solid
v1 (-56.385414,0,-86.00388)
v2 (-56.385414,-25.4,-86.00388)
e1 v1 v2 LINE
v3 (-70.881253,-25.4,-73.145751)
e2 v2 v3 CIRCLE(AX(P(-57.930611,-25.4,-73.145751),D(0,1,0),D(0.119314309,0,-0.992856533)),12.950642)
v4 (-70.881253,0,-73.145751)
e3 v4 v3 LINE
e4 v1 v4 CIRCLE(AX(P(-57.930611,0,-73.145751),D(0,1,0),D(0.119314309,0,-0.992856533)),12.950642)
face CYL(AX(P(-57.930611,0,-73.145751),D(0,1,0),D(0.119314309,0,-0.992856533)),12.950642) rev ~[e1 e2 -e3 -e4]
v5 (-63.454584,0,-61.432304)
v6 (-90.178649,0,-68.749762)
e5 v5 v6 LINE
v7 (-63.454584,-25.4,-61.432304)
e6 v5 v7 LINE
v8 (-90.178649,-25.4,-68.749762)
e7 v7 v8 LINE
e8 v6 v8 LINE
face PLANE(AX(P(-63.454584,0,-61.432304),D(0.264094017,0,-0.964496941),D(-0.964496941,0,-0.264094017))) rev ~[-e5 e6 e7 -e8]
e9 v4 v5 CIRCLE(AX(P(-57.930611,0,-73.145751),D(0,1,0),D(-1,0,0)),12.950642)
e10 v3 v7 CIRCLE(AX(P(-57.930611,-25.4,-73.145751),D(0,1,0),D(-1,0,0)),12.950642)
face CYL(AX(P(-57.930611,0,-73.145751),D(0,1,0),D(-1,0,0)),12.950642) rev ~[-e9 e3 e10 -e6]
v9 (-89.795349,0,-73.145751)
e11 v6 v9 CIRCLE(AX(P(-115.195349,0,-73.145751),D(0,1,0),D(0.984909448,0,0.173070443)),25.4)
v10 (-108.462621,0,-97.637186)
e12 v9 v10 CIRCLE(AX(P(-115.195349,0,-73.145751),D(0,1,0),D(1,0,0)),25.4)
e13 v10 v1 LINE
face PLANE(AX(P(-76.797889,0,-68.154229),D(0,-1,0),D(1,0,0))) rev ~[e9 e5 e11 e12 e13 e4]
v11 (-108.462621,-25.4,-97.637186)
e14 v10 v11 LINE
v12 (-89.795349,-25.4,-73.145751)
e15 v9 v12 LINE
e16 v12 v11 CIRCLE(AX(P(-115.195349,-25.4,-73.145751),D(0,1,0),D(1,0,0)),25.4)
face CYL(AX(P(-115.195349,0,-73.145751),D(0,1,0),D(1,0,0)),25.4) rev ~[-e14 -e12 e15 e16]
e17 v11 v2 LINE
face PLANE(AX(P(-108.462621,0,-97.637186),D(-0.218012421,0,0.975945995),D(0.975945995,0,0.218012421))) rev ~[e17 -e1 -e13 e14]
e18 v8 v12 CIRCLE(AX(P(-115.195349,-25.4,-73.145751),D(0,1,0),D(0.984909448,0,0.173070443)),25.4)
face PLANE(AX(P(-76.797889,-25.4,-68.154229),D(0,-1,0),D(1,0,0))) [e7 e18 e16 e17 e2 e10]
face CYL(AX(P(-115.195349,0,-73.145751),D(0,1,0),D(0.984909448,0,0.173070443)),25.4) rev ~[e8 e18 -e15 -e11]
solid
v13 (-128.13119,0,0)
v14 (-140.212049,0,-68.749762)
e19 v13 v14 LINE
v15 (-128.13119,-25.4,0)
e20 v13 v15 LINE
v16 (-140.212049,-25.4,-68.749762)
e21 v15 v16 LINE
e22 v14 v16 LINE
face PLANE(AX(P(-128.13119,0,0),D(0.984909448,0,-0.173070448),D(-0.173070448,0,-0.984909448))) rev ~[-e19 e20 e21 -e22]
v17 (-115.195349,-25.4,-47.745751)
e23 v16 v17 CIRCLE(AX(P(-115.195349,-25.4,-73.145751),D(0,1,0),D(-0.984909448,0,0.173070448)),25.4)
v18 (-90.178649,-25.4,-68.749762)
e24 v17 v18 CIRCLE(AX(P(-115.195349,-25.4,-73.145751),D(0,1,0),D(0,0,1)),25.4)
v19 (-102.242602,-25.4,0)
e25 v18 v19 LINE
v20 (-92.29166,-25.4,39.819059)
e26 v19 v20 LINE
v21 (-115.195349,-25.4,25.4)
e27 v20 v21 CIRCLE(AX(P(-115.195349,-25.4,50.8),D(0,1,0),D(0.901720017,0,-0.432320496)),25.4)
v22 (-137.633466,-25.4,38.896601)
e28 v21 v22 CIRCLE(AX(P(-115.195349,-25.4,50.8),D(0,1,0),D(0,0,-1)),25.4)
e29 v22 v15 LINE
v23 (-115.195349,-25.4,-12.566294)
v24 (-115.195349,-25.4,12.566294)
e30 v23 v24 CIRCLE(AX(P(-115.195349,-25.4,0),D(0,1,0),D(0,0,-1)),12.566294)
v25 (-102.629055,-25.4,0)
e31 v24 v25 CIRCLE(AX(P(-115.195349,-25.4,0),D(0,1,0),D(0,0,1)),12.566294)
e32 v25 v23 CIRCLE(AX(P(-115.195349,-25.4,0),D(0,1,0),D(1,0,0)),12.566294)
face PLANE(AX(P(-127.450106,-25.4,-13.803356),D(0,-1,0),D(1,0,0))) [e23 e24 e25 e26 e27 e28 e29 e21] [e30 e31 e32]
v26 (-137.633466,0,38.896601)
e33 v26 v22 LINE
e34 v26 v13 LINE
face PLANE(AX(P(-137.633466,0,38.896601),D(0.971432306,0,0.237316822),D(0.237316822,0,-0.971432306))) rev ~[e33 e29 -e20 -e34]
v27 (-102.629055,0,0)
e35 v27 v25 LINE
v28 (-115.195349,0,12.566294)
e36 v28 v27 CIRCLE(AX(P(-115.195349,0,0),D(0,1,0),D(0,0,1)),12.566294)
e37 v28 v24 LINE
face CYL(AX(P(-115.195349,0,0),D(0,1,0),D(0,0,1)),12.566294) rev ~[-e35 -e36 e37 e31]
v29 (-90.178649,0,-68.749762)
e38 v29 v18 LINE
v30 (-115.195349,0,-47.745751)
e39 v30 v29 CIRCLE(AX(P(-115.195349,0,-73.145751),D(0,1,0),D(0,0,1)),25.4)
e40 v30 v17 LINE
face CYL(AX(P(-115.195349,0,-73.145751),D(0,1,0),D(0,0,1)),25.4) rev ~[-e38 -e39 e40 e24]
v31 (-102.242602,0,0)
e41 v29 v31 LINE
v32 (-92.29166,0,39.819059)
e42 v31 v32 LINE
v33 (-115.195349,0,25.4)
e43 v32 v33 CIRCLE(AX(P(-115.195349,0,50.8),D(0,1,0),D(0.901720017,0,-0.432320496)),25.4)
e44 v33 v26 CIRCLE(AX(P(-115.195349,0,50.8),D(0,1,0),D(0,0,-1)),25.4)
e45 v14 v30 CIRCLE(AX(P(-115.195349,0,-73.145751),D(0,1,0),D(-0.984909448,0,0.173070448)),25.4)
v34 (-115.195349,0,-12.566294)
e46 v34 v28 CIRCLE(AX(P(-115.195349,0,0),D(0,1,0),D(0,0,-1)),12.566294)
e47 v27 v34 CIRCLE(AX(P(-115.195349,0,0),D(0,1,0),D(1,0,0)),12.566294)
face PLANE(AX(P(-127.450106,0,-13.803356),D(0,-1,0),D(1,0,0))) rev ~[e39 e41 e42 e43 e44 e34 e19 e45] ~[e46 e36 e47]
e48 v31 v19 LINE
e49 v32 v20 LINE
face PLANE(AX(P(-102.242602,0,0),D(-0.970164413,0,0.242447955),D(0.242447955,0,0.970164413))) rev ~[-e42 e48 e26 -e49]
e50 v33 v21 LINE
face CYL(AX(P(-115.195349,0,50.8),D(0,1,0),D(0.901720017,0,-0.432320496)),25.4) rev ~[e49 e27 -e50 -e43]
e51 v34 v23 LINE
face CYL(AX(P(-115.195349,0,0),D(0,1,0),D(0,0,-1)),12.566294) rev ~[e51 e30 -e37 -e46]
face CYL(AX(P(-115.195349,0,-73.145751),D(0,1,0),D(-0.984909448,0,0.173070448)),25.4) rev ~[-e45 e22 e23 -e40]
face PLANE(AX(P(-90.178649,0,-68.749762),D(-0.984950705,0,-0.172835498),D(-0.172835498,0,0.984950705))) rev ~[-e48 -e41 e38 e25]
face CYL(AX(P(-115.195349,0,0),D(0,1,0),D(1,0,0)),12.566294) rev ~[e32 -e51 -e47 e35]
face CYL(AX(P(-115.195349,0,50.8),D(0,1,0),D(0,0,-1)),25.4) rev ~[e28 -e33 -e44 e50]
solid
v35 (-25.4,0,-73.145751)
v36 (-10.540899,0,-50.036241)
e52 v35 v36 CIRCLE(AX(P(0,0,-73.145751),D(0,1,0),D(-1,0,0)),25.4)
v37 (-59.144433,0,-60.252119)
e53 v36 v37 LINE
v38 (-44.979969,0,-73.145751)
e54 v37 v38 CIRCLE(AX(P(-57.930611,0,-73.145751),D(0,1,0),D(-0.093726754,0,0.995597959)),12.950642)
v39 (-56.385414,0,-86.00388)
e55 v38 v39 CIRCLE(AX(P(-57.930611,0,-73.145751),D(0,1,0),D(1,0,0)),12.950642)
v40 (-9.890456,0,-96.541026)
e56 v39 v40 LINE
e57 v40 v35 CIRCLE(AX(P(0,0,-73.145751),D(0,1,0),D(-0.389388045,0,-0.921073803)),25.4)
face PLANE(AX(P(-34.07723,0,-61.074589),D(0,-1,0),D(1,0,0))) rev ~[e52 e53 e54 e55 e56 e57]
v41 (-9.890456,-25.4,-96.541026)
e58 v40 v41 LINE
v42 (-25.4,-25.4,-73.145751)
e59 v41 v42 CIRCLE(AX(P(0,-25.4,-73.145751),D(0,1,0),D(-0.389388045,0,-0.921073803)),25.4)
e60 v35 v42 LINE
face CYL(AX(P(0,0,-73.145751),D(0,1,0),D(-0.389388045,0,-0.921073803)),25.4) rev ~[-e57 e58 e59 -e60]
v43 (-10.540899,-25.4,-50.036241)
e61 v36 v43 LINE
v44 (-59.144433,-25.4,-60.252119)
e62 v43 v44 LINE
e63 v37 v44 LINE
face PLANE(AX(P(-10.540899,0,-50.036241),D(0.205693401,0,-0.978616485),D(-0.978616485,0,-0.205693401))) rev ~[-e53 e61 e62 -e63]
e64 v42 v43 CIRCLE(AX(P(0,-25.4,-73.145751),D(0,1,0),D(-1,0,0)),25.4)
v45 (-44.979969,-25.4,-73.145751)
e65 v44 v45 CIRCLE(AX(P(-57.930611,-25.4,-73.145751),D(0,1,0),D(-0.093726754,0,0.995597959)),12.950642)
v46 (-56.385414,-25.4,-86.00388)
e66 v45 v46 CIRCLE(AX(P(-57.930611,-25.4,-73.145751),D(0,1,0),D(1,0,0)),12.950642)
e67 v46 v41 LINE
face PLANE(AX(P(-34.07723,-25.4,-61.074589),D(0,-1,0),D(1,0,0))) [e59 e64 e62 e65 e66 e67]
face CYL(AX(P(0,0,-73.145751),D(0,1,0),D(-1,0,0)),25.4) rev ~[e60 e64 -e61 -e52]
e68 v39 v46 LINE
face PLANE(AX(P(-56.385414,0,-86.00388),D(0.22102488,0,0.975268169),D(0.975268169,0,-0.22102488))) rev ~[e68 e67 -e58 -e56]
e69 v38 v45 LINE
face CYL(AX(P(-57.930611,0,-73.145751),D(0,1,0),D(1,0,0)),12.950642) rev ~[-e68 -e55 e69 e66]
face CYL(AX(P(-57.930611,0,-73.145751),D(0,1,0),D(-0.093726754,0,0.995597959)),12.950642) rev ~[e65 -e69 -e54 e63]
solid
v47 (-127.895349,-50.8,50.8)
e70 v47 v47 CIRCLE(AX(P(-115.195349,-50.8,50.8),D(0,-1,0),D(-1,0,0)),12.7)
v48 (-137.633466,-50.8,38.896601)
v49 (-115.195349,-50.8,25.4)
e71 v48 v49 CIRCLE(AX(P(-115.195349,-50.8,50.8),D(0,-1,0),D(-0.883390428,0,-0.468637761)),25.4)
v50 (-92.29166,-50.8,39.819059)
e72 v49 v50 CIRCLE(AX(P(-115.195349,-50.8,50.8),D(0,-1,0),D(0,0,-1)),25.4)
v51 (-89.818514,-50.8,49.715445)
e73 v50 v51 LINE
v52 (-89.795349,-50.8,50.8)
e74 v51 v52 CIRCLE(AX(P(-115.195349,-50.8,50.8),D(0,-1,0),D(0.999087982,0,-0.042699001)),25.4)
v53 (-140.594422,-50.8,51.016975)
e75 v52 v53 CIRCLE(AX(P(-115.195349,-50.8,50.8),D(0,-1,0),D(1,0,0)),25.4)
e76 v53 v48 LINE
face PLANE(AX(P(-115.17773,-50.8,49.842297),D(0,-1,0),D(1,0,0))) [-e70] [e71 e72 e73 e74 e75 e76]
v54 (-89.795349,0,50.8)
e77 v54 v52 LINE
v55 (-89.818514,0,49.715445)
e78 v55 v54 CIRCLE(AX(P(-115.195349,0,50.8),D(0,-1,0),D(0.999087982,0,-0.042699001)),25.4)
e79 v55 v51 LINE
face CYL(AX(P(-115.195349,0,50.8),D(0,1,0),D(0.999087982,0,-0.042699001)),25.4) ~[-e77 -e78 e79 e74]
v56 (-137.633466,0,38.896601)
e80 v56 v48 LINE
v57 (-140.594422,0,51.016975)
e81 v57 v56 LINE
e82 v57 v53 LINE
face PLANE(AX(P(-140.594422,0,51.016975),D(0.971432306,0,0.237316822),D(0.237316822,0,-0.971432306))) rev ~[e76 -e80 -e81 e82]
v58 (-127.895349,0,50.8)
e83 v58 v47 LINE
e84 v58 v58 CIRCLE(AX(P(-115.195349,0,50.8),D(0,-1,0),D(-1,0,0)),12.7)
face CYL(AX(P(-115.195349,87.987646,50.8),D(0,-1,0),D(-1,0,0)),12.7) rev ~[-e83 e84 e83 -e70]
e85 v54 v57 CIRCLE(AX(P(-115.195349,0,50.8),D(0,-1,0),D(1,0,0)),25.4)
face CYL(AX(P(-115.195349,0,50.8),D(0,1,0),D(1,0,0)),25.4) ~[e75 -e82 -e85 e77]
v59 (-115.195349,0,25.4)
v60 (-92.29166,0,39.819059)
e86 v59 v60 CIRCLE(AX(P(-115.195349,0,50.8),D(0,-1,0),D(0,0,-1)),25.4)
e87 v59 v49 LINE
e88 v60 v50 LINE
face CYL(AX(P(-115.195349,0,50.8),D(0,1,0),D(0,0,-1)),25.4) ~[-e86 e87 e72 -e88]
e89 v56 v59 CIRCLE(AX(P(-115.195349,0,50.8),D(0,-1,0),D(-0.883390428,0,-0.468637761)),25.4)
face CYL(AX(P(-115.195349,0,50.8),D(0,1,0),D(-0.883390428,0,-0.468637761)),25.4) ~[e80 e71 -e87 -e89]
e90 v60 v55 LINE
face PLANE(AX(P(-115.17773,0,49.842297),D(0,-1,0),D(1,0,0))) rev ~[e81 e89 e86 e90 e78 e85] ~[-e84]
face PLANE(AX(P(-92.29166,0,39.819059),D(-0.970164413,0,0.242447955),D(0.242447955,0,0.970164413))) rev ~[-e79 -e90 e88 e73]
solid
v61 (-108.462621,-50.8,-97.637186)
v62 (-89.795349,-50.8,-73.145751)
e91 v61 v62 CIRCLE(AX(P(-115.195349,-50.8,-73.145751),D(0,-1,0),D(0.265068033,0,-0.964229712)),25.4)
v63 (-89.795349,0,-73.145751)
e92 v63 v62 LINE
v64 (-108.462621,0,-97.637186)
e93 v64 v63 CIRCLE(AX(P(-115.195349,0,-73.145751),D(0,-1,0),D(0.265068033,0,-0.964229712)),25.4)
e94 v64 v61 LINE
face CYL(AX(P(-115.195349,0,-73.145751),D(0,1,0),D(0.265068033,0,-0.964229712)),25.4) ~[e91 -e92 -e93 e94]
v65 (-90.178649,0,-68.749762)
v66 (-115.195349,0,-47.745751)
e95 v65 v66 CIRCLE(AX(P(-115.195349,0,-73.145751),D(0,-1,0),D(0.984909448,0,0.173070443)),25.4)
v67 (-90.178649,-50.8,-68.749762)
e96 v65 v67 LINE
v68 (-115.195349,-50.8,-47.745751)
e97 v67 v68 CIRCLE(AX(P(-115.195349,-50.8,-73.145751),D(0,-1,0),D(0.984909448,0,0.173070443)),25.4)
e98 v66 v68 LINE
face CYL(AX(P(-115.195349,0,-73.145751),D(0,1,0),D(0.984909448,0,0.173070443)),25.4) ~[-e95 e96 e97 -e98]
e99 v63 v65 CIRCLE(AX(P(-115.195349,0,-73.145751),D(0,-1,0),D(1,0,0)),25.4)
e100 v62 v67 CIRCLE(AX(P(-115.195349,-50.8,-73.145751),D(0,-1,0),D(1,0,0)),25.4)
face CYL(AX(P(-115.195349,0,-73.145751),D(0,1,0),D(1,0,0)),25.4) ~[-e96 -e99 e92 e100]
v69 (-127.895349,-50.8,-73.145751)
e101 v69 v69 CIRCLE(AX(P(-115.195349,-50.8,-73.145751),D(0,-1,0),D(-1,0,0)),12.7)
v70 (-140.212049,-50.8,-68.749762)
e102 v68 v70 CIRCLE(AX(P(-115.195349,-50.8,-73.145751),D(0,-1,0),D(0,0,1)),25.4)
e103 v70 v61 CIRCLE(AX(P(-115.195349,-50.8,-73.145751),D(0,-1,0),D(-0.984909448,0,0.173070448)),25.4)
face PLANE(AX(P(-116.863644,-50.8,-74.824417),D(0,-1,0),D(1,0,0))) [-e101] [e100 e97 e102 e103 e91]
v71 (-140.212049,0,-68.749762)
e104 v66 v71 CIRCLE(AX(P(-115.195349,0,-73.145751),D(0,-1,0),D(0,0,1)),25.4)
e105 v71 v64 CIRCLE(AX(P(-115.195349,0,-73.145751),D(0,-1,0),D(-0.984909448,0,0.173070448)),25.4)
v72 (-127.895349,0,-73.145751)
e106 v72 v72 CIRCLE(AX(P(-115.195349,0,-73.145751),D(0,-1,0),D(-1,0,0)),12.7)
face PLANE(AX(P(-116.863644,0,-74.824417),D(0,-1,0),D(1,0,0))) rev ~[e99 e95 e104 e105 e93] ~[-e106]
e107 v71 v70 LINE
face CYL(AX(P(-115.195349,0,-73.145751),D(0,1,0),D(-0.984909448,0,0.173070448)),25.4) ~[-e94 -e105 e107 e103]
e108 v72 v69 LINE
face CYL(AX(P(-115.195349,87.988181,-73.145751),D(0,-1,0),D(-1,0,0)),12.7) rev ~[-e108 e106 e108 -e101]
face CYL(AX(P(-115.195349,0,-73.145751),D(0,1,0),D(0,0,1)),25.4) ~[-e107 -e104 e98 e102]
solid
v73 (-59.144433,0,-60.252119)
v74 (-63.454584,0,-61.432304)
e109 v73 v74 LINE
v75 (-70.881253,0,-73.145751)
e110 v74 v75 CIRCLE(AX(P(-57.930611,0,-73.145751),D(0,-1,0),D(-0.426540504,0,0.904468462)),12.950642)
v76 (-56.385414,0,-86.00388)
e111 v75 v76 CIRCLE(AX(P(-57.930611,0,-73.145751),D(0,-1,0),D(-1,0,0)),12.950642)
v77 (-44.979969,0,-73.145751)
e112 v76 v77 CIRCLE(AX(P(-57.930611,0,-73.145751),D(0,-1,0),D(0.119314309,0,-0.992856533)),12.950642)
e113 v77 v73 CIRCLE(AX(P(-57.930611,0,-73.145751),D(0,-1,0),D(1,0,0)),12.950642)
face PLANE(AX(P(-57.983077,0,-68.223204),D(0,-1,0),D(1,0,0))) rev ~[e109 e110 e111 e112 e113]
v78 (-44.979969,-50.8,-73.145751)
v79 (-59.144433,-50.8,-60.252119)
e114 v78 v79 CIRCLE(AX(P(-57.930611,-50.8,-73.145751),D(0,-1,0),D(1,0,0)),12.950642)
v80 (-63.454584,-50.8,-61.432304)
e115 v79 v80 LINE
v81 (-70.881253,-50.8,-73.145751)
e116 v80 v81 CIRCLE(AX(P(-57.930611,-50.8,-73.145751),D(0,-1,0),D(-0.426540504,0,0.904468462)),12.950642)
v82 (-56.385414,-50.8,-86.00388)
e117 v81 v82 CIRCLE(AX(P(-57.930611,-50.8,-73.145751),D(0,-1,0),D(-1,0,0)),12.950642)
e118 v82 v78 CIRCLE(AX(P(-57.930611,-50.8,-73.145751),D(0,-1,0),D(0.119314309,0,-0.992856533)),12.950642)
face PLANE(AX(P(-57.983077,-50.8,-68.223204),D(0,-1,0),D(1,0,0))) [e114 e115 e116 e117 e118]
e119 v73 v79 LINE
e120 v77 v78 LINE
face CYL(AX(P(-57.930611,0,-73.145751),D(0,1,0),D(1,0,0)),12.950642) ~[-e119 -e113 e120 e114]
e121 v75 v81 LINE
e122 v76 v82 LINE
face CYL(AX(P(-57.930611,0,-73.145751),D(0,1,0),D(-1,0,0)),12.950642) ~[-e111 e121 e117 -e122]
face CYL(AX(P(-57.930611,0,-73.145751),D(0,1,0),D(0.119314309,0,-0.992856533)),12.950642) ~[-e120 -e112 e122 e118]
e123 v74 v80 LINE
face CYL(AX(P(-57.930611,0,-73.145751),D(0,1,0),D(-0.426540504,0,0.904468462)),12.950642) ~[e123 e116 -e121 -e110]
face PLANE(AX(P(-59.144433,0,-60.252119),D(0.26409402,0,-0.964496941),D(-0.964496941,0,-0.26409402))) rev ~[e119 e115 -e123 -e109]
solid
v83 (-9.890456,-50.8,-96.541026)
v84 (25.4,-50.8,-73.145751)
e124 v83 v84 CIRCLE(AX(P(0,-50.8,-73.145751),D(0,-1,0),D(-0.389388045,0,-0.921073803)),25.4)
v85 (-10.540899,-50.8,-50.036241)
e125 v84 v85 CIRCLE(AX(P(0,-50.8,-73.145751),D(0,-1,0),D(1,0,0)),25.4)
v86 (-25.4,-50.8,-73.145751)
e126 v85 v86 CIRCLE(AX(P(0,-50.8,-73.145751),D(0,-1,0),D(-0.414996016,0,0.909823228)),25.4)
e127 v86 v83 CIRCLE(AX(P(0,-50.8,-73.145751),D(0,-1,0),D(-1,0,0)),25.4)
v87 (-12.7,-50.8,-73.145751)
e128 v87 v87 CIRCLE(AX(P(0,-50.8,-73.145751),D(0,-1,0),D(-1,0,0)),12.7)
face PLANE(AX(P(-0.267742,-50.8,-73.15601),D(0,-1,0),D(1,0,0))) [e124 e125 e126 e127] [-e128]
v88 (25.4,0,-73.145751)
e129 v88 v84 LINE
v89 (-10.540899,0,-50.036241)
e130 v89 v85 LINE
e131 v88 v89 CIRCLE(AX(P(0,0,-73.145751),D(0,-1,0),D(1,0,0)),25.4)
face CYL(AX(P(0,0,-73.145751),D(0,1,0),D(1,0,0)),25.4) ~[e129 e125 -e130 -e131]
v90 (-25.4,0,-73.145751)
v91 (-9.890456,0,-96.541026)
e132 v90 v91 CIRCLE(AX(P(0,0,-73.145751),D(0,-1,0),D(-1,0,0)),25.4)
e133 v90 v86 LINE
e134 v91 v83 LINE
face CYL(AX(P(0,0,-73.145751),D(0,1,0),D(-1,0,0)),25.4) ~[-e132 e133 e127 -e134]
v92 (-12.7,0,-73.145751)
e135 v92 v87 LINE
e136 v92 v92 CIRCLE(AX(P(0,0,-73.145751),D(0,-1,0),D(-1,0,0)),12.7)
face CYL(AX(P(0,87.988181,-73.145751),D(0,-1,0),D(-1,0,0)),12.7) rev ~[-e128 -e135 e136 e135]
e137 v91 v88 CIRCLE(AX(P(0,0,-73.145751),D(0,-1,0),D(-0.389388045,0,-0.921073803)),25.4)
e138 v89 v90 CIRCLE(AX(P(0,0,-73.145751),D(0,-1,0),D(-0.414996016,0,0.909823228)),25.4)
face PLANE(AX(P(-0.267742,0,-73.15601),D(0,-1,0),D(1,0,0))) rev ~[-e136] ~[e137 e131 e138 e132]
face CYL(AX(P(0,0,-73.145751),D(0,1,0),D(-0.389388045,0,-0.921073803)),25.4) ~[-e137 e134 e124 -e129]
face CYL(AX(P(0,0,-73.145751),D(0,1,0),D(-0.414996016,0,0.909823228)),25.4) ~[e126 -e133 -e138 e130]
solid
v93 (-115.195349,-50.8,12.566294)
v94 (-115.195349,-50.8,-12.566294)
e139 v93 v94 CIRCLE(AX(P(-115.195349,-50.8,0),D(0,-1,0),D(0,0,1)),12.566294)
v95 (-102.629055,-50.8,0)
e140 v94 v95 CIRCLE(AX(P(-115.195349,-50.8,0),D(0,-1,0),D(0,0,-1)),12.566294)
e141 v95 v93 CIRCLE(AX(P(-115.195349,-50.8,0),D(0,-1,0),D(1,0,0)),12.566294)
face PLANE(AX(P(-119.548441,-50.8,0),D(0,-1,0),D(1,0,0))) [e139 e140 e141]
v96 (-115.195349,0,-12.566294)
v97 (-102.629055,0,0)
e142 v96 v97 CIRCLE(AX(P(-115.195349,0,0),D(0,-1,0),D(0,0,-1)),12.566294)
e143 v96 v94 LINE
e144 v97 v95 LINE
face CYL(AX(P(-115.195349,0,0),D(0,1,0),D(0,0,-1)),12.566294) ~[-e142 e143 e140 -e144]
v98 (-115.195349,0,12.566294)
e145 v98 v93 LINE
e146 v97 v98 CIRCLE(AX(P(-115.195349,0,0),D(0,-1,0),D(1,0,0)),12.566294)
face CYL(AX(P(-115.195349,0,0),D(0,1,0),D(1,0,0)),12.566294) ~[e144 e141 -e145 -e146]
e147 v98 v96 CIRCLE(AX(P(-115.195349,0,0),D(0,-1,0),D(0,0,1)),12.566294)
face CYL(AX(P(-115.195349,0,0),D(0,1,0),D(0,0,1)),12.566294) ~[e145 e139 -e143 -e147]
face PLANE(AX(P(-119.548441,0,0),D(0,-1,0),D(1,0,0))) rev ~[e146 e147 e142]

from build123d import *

# Parameters (mm, degrees)
F1_DEPTH = 50.8
F2_DEPTH = 25.4
F3_D     = 25.4
F3_2_D   = 25.4
F3_3_D   = 25.4


# Not quite as in the source:
# - ends of sketch curves that miss each other by under 0.0002 mm in the source are joined


with BuildPart() as f1:
    # F0 (on Front) → F1 (new body)
    with BuildSketch(Plane.XZ):
        with BuildLine():
            ThreePointArc((-115.1953488588, 25.4), (-101.6630890972, 29.30493206), (-92.291660437, 39.8190593902))
            Line((-92.291660437, 39.8190593902), (-89.8185141224, 49.7154453636))
            ThreePointArc((-89.8185141224, 49.7154453636), (-89.8011408351, 50.2575989978), (-89.7953488588, 50.8))
            ThreePointArc((-89.7953488588, 50.8), (-115.0868603739, 76.1997683109), (-140.5944221068, 51.0169749908))
            Line((-140.5944221068, 51.0169749908), (-137.6334657409, 38.8966008725))
            ThreePointArc((-137.6334657409, 38.8966008725), (-128.2875920234, 29.0341283446), (-115.1953488588, 25.4))
        make_face()
    extrude(amount=F1_DEPTH)

    # F3 (through all)
    with Locations(Plane(origin=(0, 0, 0), x_dir=(1, 0, 0), z_dir=(0, 1, 0))):
        with Locations((-115.1953488588, -50.8), (-115.1953488588, 73.1457510495), (0, 73.1457510495)):
            Hole(F3_D / 2)


with BuildPart() as f1b:
    # F0 (on Front) → F1, piece 2 (new body)
    with BuildSketch(Plane.XZ):
        with BuildLine():
            ThreePointArc((-115.1953488588, 12.5662939133), (-127.7616427722, 0), (-115.1953488588, -12.5662939133))
            Line((-115.1953488588, -12.5662939133), (-115.1953488588, 0))
            Line((-115.1953488588, 0), (-115.1953488588, 12.5662939133))
        make_face()
        with BuildLine():
            Line((-115.1953488588, 0), (-115.1953488588, -12.5662939133))
            ThreePointArc((-115.1953488588, -12.5662939133), (-106.3096372183, -8.8857116405), (-102.6290549455, 0))
            ThreePointArc((-102.6290549455, 0), (-106.3096372183, 8.8857116405), (-115.1953488588, 12.5662939133))
            Line((-115.1953488588, 12.5662939133), (-115.1953488588, 0))
        make_face()
    extrude(amount=F1_DEPTH)


with BuildPart() as f1c:
    # F0 (on Front) → F1, piece 3 (new body)
    with BuildSketch(Plane.XZ):
        with BuildLine():
            ThreePointArc((-108.4626208204, -97.6371857392), (-94.9942190368, -88.5429700813), (-89.7953488588, -73.1457510495))
            Line((-89.7953488588, -73.1457510495), (-115.1953488588, -73.1457510495))
            Line((-115.1953488588, -73.1457510495), (-115.1953488588, -47.7457510495))
            ThreePointArc((-115.1953488588, -47.7457510495), (-131.5278604467, -53.6930117763), (-140.212048827, -68.7497616611))
            ThreePointArc((-140.212048827, -68.7497616611), (-132.2891116058, -91.9330679189), (-108.4626208204, -97.6371857392))
        make_face()
        with BuildLine():
            Line((-115.1953488588, -73.1457510495), (-89.7953488588, -73.1457510495))
            ThreePointArc((-89.7953488588, -73.1457510495), (-89.891355303, -70.9394169576), (-90.1786488687, -68.7497617861))
            ThreePointArc((-90.1786488687, -68.7497617861), (-98.8628372224, -53.6930118171), (-115.1953488588, -47.7457510495))
            Line((-115.1953488588, -47.7457510495), (-115.1953488588, -73.1457510495))
        make_face()
    extrude(amount=F1_DEPTH)

    # F3#2 (through all)
    with Locations(Plane(origin=(0, 0, 0), x_dir=(1, 0, 0), z_dir=(0, 1, 0))):
        with Locations((-115.1953488588, -50.8), (-115.1953488588, 73.1457510495), (0, 73.1457510495)):
            Hole(F3_2_D / 2)


with BuildPart() as f1d:
    # F0 (on Front) → F1, piece 4 (new body)
    with BuildSketch(Plane.XZ):
        with BuildLine():
            ThreePointArc((-63.4545843049, -61.4323040872), (-68.8681180563, -66.2110512717), (-70.8812527568, -73.1457510495))
            Line((-70.8812527568, -73.1457510495), (-57.930611074, -73.1457510495))
            Line((-57.930611074, -73.1457510495), (-44.9799693912, -73.1457510495))
            ThreePointArc((-44.9799693912, -73.1457510495), (-49.2128317892, -63.5687241446), (-59.1444326796, -60.2521186247))
            Line((-59.1444326796, -60.2521186247), (-63.4545843049, -61.4323040872))
        make_face()
        with BuildLine():
            Line((-57.930611074, -73.1457510495), (-70.8812527568, -73.1457510495))
            ThreePointArc((-70.8812527568, -73.1457510495), (-66.5244411037, -82.8341567706), (-56.385414216, -86.0038802551))
            ThreePointArc((-56.385414216, -86.0038802551), (-48.2422053529, -81.7395810792), (-44.9799693912, -73.1457510495))
            Line((-44.9799693912, -73.1457510495), (-57.930611074, -73.1457510495))
        make_face()
    extrude(amount=F1_DEPTH)


with BuildPart() as f1e:
    # F0 (on Front) → F1, piece 5 (new body)
    with BuildSketch(Plane.XZ):
        with BuildLine():
            ThreePointArc((-25.4, -73.1457510495), (-21.170469895, -87.1803940597), (-9.8904563446, -96.5410256428))
            ThreePointArc((-9.8904563446, -96.5410256428), (14.0346430102, -94.3162209445), (25.4, -73.1457510495))
            ThreePointArc((25.4, -73.1457510495), (13.7371971399, -51.7810742502), (-10.5408987984, -50.0362410478))
            ThreePointArc((-10.5408987984, -50.0362410478), (-21.3646767993, -59.4085539097), (-25.4, -73.1457510495))
        make_face()
    extrude(amount=F1_DEPTH)

    # F3#3 (through all)
    with Locations(Plane(origin=(0, 0, 0), x_dir=(1, 0, 0), z_dir=(0, 1, 0))):
        with Locations((-115.1953488588, -50.8), (-115.1953488588, 73.1457510495), (0, 73.1457510495)):
            Hole(F3_3_D / 2)


with BuildPart() as f2:
    # F0 (on Front) → F2 (new body)
    with BuildSketch(Plane.XZ):
        with BuildLine():
            ThreePointArc((-140.212048827, -68.7497616611), (-131.5278604467, -53.6930117763), (-115.1953488588, -47.7457510495))
            Line((-115.1953488588, -47.7457510495), (-115.1953488588, -12.5662939133))
            ThreePointArc((-115.1953488588, -12.5662939133), (-127.7616427722, 0), (-115.1953488588, 12.5662939133))
            Line((-115.1953488588, 12.5662939133), (-115.1953488588, 25.4))
            ThreePointArc((-115.1953488588, 25.4), (-128.2875920234, 29.0341283446), (-137.6334657409, 38.8966008725))
            Line((-137.6334657409, 38.8966008725), (-128.1311899166, 0))
            Line((-128.1311899166, 0), (-140.212048827, -68.7497616611))
        make_face()
        with BuildLine():
            ThreePointArc((-115.1953488588, -47.7457510495), (-98.8628372224, -53.6930118171), (-90.1786488687, -68.7497617861))
            Line((-90.1786488687, -68.7497617861), (-102.2426021492, 0))
            Line((-102.2426021492, 0), (-92.291660437, 39.8190593902))
            ThreePointArc((-92.291660437, 39.8190593902), (-101.6630890972, 29.30493206), (-115.1953488588, 25.4))
            Line((-115.1953488588, 25.4), (-115.1953488588, 12.5662939133))
            ThreePointArc((-115.1953488588, 12.5662939133), (-106.3096372183, 8.8857116405), (-102.6290549455, 0))
            ThreePointArc((-102.6290549455, 0), (-106.3096372183, -8.8857116405), (-115.1953488588, -12.5662939133))
            Line((-115.1953488588, -12.5662939133), (-115.1953488588, -47.7457510495))
        make_face()
    extrude(amount=F2_DEPTH)


with BuildPart() as f2b:
    # F0 (on Front) → F2, piece 2 (new body)
    with BuildSketch(Plane.XZ):
        with BuildLine():
            ThreePointArc((-90.1786488687, -68.7497617861), (-89.891355303, -70.9394169576), (-89.7953488588, -73.1457510495))
            Line((-89.7953488588, -73.1457510495), (-70.8812527568, -73.1457510495))
            ThreePointArc((-70.8812527568, -73.1457510495), (-68.8681180563, -66.2110512717), (-63.4545843049, -61.4323040872))
            Line((-63.4545843049, -61.4323040872), (-90.1786488687, -68.7497617861))
        make_face()
        with BuildLine():
            Line((-70.8812527568, -73.1457510495), (-89.7953488588, -73.1457510495))
            ThreePointArc((-89.7953488588, -73.1457510495), (-94.9942190368, -88.5429700813), (-108.4626208204, -97.6371857392))
            Line((-108.4626208204, -97.6371857392), (-56.385414216, -86.0038802551))
            ThreePointArc((-56.385414216, -86.0038802551), (-66.5244411037, -82.8341567706), (-70.8812527568, -73.1457510495))
        make_face()
    extrude(amount=F2_DEPTH)


with BuildPart() as f2c:
    # F0 (on Front) → F2, piece 3 (new body)
    with BuildSketch(Plane.XZ):
        with BuildLine():
            ThreePointArc((-59.1444326796, -60.2521186247), (-49.2128317892, -63.5687241446), (-44.9799693912, -73.1457510495))
            Line((-44.9799693912, -73.1457510495), (-25.4, -73.1457510495))
            ThreePointArc((-25.4, -73.1457510495), (-21.3646767993, -59.4085539097), (-10.5408987984, -50.0362410478))
            Line((-10.5408987984, -50.0362410478), (-59.1444326796, -60.2521186247))
        make_face()
        with BuildLine():
            ThreePointArc((-44.9799693912, -73.1457510495), (-48.2422053529, -81.7395810792), (-56.385414216, -86.0038802551))
            Line((-56.385414216, -86.0038802551), (-9.8904563446, -96.5410256428))
            ThreePointArc((-9.8904563446, -96.5410256428), (-21.170469895, -87.1803940597), (-25.4, -73.1457510495))
            Line((-25.4, -73.1457510495), (-44.9799693912, -73.1457510495))
        make_face()
    extrude(amount=F2_DEPTH)


solid = Compound([f1.part, f1b.part, f1c.part, f1d.part, f1e.part, f2.part, f2b.part, f2c.part])
